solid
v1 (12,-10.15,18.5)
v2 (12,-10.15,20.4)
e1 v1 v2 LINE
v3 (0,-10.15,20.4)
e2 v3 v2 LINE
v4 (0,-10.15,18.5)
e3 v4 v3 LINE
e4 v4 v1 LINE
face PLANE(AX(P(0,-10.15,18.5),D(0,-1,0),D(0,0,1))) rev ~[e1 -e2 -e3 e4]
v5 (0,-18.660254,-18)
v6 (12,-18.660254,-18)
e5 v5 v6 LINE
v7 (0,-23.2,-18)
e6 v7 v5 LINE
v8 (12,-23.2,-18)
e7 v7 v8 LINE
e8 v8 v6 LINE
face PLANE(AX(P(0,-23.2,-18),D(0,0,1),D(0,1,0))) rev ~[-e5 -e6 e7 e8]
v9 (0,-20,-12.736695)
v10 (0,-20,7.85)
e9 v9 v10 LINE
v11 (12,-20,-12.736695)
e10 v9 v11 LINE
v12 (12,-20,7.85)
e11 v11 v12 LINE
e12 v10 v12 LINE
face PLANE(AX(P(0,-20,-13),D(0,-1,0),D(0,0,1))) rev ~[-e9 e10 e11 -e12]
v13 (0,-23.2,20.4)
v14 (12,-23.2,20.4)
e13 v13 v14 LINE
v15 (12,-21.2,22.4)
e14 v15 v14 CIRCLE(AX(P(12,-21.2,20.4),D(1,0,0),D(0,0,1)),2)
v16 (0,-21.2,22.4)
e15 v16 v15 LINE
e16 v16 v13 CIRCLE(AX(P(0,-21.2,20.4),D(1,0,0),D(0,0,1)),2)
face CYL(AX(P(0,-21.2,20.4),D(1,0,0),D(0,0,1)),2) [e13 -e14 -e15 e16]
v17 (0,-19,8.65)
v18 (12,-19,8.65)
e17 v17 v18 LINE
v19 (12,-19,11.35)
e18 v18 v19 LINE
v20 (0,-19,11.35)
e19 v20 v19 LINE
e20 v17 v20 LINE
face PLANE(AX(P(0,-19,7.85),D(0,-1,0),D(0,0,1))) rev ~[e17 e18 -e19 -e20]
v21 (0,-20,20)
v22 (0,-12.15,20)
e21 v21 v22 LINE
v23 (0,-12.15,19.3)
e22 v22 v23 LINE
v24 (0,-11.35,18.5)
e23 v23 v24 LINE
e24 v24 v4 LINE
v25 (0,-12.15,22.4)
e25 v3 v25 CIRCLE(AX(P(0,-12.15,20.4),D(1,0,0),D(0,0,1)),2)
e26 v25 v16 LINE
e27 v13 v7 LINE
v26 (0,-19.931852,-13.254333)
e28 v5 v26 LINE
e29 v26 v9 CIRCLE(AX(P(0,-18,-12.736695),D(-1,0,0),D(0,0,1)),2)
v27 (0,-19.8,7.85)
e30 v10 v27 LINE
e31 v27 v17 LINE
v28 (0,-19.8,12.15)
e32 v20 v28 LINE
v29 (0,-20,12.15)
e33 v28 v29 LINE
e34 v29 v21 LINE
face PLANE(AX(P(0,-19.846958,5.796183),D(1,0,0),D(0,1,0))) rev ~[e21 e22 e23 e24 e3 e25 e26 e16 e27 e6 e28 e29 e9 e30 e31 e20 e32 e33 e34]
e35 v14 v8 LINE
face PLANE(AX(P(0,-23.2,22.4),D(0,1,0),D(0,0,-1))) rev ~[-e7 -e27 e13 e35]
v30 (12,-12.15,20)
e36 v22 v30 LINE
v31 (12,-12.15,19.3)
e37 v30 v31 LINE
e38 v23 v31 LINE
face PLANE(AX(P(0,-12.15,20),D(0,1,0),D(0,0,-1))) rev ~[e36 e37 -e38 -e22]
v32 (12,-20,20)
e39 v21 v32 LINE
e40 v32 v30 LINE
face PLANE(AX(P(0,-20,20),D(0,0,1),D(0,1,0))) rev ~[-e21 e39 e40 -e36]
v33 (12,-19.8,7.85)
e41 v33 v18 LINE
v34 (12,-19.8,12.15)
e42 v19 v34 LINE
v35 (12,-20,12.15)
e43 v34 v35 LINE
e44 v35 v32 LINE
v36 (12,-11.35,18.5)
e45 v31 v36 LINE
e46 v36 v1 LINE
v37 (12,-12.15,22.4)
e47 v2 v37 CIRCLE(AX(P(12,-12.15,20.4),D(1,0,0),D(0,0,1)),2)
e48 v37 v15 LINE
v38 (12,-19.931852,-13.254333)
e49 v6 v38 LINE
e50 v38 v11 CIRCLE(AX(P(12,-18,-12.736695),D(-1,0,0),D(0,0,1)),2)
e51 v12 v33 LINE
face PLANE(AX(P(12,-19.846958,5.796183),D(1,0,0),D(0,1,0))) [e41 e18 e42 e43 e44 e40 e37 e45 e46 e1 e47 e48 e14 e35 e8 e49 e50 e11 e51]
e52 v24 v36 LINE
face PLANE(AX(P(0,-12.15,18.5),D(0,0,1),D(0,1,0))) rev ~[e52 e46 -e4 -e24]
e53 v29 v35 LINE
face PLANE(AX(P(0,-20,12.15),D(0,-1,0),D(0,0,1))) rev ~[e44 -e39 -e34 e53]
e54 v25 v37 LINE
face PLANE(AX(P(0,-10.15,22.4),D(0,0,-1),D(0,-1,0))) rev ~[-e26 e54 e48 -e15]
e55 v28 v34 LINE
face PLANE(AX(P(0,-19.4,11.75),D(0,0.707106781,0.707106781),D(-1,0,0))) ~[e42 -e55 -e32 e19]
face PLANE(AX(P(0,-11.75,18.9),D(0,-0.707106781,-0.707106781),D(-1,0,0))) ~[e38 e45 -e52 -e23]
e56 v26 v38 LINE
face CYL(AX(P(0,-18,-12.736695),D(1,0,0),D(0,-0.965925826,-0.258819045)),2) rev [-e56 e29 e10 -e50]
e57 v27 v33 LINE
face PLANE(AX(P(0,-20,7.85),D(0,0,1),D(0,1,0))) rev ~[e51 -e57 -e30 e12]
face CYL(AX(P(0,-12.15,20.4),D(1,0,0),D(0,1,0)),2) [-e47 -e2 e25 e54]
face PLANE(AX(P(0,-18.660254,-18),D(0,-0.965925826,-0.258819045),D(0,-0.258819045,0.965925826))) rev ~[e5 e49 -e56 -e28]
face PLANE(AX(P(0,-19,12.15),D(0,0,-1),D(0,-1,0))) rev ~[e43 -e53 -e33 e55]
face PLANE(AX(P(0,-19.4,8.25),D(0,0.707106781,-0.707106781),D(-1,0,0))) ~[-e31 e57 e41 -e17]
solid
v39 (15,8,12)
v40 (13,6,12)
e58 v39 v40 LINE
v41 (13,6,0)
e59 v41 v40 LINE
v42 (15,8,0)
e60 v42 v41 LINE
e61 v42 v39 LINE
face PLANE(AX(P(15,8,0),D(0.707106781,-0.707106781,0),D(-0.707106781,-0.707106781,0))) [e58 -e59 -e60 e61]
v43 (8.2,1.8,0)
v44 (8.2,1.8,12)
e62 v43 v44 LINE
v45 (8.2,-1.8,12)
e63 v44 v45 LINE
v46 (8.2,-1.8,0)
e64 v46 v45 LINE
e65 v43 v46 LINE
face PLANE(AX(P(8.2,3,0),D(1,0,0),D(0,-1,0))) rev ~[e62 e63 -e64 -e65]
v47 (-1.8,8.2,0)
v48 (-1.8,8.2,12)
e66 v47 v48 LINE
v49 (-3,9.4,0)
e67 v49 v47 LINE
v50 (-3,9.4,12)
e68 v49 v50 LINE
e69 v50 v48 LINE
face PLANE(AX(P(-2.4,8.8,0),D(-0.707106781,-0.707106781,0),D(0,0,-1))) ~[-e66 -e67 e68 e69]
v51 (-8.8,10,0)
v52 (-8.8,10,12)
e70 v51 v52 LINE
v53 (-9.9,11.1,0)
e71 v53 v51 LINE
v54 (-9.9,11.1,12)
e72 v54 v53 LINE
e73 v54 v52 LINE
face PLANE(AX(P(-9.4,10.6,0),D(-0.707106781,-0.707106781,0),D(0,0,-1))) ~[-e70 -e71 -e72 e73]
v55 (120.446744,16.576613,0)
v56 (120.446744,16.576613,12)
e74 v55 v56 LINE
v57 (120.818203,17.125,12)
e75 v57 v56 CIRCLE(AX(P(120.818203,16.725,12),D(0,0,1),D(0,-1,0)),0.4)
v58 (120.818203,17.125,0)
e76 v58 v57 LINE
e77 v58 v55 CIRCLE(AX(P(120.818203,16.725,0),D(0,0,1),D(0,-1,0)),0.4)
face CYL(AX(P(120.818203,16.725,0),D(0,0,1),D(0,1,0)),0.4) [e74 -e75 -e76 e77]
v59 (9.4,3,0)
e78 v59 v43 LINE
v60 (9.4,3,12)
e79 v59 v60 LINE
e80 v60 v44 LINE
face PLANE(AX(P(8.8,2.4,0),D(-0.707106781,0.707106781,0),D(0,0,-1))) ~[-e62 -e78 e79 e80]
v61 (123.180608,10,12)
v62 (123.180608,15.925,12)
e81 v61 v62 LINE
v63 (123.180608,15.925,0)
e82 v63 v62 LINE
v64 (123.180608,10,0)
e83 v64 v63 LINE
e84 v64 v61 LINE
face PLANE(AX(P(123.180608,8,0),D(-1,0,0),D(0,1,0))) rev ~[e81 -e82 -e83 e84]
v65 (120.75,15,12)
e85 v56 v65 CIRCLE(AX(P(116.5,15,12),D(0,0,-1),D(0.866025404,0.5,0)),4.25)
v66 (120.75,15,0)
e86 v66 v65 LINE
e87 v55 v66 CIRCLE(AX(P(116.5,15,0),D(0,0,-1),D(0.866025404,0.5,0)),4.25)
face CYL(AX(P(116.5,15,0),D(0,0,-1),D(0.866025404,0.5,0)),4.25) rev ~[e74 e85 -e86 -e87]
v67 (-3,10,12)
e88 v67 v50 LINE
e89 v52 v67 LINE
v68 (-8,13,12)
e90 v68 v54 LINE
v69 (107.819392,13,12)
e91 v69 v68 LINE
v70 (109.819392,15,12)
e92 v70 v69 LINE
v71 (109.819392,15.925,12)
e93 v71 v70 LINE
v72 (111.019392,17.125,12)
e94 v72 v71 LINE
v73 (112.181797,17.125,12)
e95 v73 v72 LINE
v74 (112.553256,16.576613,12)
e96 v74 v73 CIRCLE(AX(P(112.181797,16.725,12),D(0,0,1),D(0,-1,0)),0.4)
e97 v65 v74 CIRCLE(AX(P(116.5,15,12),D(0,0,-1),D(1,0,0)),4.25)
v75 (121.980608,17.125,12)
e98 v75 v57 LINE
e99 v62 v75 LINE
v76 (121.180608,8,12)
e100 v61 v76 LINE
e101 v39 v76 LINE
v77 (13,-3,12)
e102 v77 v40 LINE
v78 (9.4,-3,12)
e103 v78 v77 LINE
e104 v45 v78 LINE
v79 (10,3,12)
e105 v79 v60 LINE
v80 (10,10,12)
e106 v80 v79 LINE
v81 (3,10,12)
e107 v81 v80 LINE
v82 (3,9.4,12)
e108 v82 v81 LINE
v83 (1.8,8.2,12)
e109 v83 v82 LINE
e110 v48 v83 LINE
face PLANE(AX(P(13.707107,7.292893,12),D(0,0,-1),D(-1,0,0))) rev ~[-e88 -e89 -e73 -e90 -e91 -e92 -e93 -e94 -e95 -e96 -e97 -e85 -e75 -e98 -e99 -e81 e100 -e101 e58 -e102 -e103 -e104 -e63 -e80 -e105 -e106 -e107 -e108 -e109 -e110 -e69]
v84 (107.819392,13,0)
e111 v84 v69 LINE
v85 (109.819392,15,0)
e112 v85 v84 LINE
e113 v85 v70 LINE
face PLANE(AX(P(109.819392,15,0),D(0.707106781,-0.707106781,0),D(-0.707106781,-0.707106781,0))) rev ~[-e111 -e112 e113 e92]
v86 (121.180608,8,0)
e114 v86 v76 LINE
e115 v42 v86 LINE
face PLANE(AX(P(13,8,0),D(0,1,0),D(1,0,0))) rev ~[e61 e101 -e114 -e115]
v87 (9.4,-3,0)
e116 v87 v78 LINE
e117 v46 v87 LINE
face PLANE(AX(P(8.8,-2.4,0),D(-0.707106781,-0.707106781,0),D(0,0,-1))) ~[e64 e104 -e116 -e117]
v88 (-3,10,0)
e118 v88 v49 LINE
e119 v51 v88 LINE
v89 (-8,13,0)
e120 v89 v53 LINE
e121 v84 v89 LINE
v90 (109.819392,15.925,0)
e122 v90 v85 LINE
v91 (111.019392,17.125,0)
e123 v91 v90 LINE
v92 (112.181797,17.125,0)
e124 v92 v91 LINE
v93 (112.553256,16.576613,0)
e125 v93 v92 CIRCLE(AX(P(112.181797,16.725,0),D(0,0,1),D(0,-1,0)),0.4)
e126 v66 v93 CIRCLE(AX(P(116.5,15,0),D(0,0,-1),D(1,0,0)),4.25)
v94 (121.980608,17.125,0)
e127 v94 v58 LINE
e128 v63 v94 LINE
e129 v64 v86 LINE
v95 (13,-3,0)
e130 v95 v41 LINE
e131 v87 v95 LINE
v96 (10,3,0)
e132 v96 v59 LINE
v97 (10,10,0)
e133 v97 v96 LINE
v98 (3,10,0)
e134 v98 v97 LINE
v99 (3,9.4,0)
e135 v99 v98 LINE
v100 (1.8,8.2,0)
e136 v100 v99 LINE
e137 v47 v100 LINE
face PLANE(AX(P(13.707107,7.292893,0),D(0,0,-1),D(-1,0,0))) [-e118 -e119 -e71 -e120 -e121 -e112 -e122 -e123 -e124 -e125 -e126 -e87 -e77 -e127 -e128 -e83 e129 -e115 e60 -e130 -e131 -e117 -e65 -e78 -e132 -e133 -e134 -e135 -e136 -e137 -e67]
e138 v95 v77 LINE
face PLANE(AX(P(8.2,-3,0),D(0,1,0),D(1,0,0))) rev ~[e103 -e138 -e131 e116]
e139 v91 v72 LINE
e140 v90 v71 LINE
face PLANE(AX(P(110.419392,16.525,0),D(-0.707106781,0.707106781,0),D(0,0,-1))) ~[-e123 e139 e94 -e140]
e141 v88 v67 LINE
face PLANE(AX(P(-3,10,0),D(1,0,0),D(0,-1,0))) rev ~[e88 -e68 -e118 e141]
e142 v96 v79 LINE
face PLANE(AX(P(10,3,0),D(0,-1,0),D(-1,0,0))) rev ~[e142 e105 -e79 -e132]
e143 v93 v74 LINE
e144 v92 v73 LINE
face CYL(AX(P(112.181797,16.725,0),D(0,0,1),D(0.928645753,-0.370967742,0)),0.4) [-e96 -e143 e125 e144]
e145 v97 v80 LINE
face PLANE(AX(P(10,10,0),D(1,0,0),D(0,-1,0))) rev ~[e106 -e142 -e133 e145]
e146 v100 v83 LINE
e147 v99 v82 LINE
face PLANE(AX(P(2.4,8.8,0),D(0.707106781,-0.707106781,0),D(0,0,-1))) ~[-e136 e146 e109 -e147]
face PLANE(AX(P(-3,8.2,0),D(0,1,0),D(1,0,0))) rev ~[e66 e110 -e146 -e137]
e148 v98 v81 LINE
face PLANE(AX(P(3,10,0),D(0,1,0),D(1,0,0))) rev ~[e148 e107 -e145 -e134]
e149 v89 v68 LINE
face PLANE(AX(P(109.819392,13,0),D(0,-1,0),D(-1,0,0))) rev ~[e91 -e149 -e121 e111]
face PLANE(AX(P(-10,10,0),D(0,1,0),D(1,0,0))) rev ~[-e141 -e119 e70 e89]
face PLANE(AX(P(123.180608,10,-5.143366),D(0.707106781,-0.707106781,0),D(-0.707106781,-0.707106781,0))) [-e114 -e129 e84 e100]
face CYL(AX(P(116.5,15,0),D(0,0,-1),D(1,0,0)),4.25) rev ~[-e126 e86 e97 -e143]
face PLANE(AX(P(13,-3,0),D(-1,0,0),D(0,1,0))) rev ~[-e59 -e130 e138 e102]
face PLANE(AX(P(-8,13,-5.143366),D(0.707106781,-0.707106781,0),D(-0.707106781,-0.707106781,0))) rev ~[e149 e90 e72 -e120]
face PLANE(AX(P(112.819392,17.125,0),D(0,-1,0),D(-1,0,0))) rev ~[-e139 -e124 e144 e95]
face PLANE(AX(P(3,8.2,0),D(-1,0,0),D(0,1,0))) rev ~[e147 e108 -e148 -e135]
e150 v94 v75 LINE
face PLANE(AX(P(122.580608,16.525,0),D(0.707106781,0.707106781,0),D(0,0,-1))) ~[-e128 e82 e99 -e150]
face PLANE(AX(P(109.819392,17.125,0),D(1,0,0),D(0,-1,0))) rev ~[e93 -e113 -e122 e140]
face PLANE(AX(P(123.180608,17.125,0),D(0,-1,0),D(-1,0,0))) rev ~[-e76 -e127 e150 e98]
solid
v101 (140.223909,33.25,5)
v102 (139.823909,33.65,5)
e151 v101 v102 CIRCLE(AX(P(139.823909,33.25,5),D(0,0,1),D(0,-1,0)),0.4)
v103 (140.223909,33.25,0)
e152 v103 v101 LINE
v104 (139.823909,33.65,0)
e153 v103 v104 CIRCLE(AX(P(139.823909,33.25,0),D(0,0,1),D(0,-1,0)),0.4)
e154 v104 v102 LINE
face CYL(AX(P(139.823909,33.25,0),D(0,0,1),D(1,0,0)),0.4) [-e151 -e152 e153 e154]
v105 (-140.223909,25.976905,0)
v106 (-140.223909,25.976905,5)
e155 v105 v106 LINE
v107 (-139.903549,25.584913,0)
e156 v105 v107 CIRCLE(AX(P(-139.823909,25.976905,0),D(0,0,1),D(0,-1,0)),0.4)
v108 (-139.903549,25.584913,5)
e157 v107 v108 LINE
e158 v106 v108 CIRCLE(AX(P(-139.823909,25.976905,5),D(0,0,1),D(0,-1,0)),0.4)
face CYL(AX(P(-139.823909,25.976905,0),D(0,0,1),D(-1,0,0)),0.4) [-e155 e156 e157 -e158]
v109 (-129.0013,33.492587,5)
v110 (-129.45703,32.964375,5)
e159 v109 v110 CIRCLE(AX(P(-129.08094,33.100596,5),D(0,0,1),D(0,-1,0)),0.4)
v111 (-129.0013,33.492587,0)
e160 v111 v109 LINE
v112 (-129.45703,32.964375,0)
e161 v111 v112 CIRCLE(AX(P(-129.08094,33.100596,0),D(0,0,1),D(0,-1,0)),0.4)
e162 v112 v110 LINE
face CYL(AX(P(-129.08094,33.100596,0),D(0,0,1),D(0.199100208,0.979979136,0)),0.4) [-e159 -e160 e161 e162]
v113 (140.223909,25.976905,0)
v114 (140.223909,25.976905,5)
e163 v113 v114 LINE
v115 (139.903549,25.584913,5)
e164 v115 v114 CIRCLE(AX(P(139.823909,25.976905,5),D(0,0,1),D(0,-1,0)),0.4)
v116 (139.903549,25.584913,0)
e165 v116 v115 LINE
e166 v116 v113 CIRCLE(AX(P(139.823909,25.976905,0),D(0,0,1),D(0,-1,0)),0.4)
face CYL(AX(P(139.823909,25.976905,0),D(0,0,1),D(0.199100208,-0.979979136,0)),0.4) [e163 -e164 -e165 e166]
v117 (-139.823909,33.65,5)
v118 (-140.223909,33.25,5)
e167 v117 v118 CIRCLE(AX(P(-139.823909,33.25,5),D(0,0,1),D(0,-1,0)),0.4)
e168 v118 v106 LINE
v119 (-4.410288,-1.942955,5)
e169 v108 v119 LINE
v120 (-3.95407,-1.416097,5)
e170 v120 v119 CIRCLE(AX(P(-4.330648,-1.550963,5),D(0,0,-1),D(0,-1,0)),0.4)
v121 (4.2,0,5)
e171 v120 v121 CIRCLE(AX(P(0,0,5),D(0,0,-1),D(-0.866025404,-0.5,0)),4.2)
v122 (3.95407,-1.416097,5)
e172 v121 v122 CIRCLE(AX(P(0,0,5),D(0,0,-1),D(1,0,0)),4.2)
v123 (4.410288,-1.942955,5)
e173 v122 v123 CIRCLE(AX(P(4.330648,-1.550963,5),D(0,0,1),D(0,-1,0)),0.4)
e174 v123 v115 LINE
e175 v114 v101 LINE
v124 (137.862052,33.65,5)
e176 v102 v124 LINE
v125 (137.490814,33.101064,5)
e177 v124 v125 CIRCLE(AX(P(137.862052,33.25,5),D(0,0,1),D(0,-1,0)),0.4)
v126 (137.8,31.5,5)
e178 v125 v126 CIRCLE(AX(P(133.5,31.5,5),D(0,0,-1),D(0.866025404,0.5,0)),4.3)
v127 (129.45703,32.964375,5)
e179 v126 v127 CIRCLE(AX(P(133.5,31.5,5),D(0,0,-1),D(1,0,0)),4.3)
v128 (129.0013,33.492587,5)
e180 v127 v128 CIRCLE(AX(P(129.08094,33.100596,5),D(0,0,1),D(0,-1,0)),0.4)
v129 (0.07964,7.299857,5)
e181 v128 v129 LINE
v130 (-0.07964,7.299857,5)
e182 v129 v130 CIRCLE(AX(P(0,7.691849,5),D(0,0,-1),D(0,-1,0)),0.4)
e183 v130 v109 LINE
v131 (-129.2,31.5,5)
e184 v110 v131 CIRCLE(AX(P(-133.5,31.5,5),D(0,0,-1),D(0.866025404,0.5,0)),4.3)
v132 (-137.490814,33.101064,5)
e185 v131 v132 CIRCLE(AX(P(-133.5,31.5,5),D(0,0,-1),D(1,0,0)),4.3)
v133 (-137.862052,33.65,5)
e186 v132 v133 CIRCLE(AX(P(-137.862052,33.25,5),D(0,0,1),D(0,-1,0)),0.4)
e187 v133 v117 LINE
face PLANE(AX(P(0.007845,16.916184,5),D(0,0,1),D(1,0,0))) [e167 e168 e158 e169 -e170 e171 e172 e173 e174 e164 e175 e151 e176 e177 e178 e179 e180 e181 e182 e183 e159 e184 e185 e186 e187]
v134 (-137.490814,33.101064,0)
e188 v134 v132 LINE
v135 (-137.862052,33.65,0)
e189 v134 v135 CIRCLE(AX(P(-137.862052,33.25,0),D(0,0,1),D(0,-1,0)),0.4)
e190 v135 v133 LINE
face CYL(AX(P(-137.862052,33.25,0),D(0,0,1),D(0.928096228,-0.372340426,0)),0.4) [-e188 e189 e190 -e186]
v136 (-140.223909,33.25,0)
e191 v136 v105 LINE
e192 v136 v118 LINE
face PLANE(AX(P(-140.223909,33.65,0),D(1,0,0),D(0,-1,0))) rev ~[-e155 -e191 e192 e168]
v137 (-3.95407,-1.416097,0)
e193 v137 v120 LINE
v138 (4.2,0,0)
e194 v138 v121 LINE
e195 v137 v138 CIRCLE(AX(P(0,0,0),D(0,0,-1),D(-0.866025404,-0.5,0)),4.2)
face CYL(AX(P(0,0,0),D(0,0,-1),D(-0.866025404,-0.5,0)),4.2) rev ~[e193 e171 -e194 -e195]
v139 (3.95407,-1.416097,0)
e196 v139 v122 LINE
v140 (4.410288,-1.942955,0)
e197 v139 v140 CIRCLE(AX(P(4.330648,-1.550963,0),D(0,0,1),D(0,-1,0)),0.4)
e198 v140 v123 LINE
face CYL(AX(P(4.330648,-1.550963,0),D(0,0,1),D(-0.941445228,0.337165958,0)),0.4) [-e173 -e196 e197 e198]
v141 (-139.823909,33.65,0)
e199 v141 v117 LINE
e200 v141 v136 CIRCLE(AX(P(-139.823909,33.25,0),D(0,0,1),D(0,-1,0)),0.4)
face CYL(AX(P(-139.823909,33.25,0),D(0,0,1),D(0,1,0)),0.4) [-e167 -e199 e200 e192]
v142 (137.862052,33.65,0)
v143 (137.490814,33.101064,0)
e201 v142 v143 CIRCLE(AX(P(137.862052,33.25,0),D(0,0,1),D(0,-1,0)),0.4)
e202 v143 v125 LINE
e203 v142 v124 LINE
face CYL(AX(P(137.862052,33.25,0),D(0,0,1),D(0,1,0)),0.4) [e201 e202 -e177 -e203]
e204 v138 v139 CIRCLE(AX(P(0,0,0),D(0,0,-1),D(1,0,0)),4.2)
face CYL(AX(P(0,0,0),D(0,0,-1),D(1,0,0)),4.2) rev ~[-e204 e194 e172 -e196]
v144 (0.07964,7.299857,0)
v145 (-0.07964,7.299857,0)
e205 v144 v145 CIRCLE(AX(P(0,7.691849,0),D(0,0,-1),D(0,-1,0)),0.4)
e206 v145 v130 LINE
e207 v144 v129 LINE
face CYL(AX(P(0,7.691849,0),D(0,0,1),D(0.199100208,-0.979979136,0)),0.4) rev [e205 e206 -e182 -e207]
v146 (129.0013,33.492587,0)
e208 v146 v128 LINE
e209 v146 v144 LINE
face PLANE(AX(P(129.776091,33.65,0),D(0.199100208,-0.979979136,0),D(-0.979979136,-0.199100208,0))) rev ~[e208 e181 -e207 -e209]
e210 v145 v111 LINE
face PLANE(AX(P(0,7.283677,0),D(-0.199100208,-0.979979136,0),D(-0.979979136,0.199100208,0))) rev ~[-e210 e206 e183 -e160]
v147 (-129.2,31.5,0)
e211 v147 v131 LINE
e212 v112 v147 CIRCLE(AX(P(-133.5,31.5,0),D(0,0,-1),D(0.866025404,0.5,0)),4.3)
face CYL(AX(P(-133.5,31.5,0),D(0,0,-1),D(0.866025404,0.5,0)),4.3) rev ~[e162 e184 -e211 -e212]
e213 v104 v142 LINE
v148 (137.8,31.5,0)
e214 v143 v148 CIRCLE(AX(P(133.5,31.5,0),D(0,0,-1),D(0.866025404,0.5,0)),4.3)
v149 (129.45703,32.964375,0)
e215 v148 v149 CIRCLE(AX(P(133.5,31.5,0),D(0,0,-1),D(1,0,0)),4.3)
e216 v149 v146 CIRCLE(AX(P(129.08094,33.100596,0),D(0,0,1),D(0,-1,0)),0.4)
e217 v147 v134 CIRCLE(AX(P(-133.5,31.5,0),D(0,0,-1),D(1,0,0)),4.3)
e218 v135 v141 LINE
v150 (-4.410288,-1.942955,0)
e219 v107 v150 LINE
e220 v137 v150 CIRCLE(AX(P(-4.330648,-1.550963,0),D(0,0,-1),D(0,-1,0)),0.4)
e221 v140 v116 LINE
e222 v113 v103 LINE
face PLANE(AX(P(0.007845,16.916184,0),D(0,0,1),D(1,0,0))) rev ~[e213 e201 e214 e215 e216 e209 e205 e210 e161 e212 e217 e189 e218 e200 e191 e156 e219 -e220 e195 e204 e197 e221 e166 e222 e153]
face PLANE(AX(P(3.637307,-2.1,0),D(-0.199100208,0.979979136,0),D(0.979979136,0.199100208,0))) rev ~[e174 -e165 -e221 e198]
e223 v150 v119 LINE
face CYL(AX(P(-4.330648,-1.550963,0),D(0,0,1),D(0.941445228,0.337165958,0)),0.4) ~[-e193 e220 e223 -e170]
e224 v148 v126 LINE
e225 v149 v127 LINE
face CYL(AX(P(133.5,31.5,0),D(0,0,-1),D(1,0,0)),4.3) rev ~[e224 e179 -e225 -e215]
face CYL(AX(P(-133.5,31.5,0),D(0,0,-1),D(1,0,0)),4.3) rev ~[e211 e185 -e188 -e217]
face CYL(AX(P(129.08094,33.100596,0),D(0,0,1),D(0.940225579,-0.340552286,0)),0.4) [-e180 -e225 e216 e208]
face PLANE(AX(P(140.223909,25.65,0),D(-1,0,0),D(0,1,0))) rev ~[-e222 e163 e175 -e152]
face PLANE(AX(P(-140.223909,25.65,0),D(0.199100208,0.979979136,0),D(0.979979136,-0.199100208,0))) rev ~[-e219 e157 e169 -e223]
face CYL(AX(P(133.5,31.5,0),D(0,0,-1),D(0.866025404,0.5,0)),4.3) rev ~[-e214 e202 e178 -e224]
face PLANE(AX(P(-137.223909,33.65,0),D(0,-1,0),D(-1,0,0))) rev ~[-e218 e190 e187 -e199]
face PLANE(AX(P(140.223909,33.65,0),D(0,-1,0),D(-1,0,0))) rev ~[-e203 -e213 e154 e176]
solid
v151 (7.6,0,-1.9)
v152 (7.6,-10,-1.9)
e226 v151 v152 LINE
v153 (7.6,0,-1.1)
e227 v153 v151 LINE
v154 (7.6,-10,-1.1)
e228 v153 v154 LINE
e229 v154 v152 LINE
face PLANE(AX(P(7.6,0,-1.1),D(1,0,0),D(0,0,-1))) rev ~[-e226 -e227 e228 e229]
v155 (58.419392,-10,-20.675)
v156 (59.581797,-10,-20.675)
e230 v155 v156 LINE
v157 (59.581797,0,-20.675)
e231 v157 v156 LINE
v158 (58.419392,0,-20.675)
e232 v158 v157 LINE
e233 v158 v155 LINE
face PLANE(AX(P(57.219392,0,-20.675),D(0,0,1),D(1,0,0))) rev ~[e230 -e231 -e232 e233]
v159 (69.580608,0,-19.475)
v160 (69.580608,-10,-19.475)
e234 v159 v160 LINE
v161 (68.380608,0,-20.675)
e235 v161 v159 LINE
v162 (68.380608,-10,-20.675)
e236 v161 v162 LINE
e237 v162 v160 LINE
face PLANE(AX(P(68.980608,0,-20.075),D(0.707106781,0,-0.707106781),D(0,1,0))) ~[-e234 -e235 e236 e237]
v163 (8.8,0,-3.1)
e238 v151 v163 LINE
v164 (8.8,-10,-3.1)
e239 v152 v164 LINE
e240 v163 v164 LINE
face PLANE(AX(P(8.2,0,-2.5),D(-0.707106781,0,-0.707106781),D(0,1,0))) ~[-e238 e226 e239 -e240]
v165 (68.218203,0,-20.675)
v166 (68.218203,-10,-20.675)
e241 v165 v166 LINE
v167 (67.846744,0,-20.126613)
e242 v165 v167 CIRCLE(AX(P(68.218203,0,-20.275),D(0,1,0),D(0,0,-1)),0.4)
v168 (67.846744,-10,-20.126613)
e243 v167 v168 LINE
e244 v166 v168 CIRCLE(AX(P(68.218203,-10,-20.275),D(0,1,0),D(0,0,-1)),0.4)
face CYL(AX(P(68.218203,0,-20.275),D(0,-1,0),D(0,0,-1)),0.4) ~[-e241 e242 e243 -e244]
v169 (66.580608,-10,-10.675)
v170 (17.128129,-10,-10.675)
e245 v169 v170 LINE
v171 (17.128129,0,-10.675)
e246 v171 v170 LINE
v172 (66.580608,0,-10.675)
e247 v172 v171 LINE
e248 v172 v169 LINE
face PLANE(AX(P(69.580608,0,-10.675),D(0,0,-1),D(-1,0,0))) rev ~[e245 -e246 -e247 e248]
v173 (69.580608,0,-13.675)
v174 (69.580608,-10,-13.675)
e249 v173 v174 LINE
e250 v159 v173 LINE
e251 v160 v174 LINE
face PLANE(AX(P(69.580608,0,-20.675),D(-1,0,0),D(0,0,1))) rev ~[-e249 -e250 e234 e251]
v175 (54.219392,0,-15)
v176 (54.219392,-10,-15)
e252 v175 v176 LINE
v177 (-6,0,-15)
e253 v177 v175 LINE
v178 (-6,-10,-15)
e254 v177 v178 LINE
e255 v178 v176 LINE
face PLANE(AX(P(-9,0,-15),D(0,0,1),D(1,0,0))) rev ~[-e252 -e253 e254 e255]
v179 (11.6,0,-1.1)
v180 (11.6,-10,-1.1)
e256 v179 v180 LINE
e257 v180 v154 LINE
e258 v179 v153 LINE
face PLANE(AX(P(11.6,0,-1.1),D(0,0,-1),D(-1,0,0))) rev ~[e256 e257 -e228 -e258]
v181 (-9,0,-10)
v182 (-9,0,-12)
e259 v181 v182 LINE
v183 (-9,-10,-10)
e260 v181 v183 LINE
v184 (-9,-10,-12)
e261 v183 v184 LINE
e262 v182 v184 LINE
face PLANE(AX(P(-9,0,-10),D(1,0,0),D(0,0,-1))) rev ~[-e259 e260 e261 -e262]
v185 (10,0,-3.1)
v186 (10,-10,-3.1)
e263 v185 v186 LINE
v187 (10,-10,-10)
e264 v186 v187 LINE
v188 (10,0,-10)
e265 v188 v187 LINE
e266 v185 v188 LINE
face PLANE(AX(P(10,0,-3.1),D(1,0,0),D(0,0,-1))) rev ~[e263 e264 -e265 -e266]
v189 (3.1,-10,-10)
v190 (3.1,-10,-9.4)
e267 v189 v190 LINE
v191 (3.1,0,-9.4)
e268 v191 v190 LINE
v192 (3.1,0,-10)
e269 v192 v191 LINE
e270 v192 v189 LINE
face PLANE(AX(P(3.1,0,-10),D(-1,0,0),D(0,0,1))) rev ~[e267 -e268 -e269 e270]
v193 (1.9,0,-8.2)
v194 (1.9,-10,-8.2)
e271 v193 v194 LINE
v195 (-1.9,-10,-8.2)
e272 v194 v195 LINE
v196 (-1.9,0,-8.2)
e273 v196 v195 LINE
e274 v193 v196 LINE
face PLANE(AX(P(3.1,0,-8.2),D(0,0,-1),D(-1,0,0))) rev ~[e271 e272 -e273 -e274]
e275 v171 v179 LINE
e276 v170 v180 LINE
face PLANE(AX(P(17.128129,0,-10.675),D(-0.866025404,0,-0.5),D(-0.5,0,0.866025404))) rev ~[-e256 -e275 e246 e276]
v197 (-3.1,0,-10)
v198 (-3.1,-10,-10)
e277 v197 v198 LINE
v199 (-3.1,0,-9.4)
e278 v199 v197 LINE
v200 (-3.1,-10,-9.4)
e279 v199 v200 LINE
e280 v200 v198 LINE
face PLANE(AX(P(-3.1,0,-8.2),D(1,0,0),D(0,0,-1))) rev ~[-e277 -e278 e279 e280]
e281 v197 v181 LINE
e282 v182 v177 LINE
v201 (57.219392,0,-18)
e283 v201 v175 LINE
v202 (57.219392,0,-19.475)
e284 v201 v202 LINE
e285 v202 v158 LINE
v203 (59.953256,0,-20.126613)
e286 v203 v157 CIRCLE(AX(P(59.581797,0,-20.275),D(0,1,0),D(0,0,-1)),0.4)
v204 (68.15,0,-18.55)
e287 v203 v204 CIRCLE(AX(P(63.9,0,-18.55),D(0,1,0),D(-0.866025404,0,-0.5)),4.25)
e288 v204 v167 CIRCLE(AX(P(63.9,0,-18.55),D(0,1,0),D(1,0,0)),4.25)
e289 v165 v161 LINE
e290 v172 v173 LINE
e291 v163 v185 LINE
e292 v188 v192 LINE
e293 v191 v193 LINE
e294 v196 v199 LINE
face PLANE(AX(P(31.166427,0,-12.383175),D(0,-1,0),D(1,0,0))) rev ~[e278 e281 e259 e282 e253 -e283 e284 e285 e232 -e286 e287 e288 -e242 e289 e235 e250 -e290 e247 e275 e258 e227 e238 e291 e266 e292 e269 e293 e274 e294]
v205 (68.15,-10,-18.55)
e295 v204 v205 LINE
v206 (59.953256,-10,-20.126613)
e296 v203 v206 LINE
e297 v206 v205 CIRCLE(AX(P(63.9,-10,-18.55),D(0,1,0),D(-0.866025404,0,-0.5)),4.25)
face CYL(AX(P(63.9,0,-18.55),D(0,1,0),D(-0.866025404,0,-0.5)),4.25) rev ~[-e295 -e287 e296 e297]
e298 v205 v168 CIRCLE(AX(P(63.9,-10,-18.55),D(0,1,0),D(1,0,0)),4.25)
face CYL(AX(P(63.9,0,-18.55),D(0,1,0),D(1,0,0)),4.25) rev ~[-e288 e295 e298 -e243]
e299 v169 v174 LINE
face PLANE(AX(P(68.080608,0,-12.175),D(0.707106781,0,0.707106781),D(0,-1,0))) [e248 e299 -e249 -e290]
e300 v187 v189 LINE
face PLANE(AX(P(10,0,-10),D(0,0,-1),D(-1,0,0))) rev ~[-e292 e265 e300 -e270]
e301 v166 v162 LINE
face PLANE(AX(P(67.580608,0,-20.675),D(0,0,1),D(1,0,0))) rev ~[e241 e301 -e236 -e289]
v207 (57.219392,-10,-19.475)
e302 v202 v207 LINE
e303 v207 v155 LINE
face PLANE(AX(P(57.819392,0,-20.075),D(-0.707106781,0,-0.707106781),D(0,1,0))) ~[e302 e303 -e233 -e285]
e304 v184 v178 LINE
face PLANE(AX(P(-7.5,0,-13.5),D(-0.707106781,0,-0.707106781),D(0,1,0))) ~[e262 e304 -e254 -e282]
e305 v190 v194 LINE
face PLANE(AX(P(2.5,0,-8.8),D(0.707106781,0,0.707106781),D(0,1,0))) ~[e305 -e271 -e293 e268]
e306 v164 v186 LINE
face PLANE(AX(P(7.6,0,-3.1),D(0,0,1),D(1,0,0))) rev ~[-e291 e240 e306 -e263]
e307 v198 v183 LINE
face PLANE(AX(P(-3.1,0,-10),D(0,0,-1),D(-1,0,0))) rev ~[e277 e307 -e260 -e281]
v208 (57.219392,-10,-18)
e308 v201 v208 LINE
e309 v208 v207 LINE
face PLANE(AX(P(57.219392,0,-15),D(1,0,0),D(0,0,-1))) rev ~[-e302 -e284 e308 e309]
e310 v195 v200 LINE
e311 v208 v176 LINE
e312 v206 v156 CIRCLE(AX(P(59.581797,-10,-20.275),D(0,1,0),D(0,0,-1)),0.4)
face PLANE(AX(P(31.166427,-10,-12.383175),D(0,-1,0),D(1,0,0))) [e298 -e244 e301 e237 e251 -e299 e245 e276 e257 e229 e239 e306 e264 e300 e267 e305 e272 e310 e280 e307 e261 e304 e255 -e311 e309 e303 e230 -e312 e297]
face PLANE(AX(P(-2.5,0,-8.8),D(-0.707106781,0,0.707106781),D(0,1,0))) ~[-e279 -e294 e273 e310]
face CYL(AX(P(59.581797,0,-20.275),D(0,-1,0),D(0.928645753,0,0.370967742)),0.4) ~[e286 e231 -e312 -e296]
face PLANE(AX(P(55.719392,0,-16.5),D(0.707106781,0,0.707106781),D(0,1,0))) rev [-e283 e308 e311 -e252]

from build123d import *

# Parameters (mm, degrees)
F2_DEPTH    = 10
F3_SIZE     = 1.2
F4_SIZE     = 3
F6_DEPTH    = 12
F7_SIZE     = 1.2
F8_T1_DEPTH = 12
F8_T3_DEPTH = 22.2867319519
F9_R        = 0.4
F9_2_R      = 0.4
F15_DEPTH   = 5
F16_R       = 0.4
F12_DEPTH   = 12
F13_SIZE    = 0.8
F14_R       = 2


# Not quite as in the source:
# - a fillet or chamfer that OpenCascade refuses, or shapes differently, is made with other operations: its cross-section is extruded or revolved along the edge and cut away or added


with BuildPart() as f2:
    # F1 (on Front) → F2 (new body)
    with BuildSketch(Plane.XZ):
        with BuildLine():
            Line((7.6, -1.1), (7.6, -3.1))
            Line((7.6, -3.1), (10, -3.1))
            Line((10, -3.1), (10, -10))
            Line((10, -10), (3.1, -10))
            Line((3.1, -10), (3.1, -8.2))
            Line((3.1, -8.2), (-3.1, -8.2))
            Line((-3.1, -8.2), (-3.1, -10))
            Line((-3.1, -10), (-9, -10))
            Line((-9, -10), (-9, -15))
            Line((-9, -15), (57.2193920339, -15))
            Line((57.2193920339, -15), (57.2193920339, -20.675))
            Line((57.2193920339, -20.675), (60.2193920339, -20.675))
            ThreePointArc((60.2193920339, -20.675), (62.8000190583, -14.4448152383), (68.15, -18.55))
            ThreePointArc((68.15, -18.55), (68.0051847617, -19.6499809417), (67.5806079661, -20.675))
            Line((67.5806079661, -20.675), (69.5806079661, -20.675))
            Line((69.5806079661, -20.675), (69.5806079661, -10.675))
            Line((69.5806079661, -10.675), (17.1281288275, -10.675))
            Line((17.1281288275, -10.675), (11.6, -1.1))
            Line((11.6, -1.1), (7.6, -1.1))
        make_face()
    extrude(amount=F2_DEPTH)

    # F3
    f3_edges = [f2.edges().sort_by_distance(p)[0] for p in [
        (-3.1, -5, -8.2),
        (3.1, -5, -8.2),
        (7.6, -5, -3.1),
        (57.219392, -5, -20.675),
        (69.580608, -5, -20.675),
    ]]
    chamfer(f3_edges, length=F3_SIZE)

    # F4
    f4_edges = [f2.edges().sort_by_distance(p)[0] for p in [
        (-9, -5, -15),
        (57.219392, -5, -15),
        (69.580608, -5, -10.675),
    ]]
    chamfer(f4_edges, length=F4_SIZE)

    # F9
    f9_edges = [f2.edges().sort_by_distance(p)[0] for p in [
        (60.219392, -5, -20.675),
        (67.580608, -5, -20.675),
    ]]
    fillet(f9_edges, radius=F9_R)


with BuildPart() as f6:
    # F5 (on Top) → F6 (new body)
    with BuildSketch(Plane.XY):
        with BuildLine():
            ThreePointArc((120.1806079661, 17.125), (120.6051847617, 16.0999809417), (120.75, 15))
            ThreePointArc((120.75, 15), (115.4000190583, 10.8948152383), (112.8193920339, 17.125))
            Line((112.8193920339, 17.125), (109.8193920339, 17.125))
            Line((109.8193920339, 17.125), (109.8193920339, 13))
            Line((109.8193920339, 13), (-10, 13))
            Line((-10, 13), (-10, 10))
            Line((-10, 10), (-3, 10))
            Line((-3, 10), (-3, 8.2))
            Line((-3, 8.2), (3, 8.2))
            Line((3, 8.2), (3, 10))
            Line((3, 10), (10, 10))
            Line((10, 10), (10, 3))
            Line((10, 3), (8.2, 3))
            Line((8.2, 3), (8.2, -3))
            Line((8.2, -3), (10, -3))
            Line((10, -3), (13, -3))
            Line((13, -3), (13, 8))
            Line((13, 8), (123.1806079661, 8))
            Line((123.1806079661, 8), (123.1806079661, 17.125))
            Line((123.1806079661, 17.125), (120.1806079661, 17.125))
        make_face()
    extrude(amount=F6_DEPTH)

    # F7
    f7_edges = [f6.edges().sort_by_distance(p)[0] for p in [
        (8.2, 3, 6),
        (8.2, -3, 6),
        (-3, 8.2, 6),
        (3, 8.2, 6),
        (-10, 10, 6),
        (109.819392, 17.125, 6),
        (123.180608, 17.125, 6),
    ]]
    chamfer(f7_edges, length=F7_SIZE)

    # F8: chamfer of 2 on 4 edges, made by hand

    # F8_s2 → F8_t1 (join)
    with BuildSketch(Plane.XY):
        Polygon((15, 8), (13, 6), (13, 8), align=None)
        Polygon((109.8193920339, 15), (107.8193920339, 13), (109.8193920339, 13), align=None)
    extrude(amount=F8_T1_DEPTH)

    # F8_s4 → F8_t3 (cut)
    with BuildSketch(Plane.XY.offset(-5.1433659759)):
        Polygon((-8, 13), (-10, 11), (-10, 13), align=None)
        Polygon((123.1806079661, 10), (121.1806079661, 8), (123.1806079661, 8), align=None)
    extrude(amount=F8_T3_DEPTH, mode=Mode.SUBTRACT)

    # F9#2
    f9_2_edges = [f6.edges().sort_by_distance(p)[0] for p in [
        (112.819392, 17.125, 6),
        (120.180608, 17.125, 6),
    ]]
    fillet(f9_2_edges, radius=F9_2_R)


with BuildPart() as f15:
    # F10 (on Top) → F15 (new body)
    with BuildSketch(Plane.XY):
        with BuildLine():
            ThreePointArc((-3.6373066959, -2.1), (-1.0870399894, 4.0568884704), (4.2, 0))
            ThreePointArc((4.2, 0), (4.0568884704, -1.0870399894), (3.6373066959, -2.1))
            Line((3.6373066959, -2.1), (140.2239092363, 25.65))
            Line((140.2239092363, 25.65), (140.2239092363, 33.65))
            Line((140.2239092363, 33.65), (137.2239092363, 33.65))
            ThreePointArc((137.2239092363, 33.65), (137.653481053, 32.6129218939), (137.8, 31.5))
            ThreePointArc((137.8, 31.5), (132.3870781061, 27.346518947), (129.7760907637, 33.65))
            Line((129.7760907637, 33.65), (0, 7.2836767171))
            Line((0, 7.2836767171), (-129.7760907637, 33.65))
            ThreePointArc((-129.7760907637, 33.65), (-129.346518947, 32.6129218939), (-129.2, 31.5))
            ThreePointArc((-129.2, 31.5), (-134.6129218939, 27.346518947), (-137.2239092363, 33.65))
            Line((-137.2239092363, 33.65), (-140.2239092363, 33.65))
            Line((-140.2239092363, 33.65), (-140.2239092363, 25.65))
            Line((-140.2239092363, 25.65), (-3.6373066959, -2.1))
        make_face()
    extrude(amount=F15_DEPTH)

    # F16
    f16_edges = [f15.edges().sort_by_distance(p)[0] for p in [
        (-3.637307, -2.1, 2.5),
        (3.637307, -2.1, 2.5),
        (0, 7.283677, 2.5),
        (129.776091, 33.65, 2.5),
        (137.223909, 33.65, 2.5),
        (140.223909, 33.65, 2.5),
        (140.223909, 25.65, 2.5),
        (-140.223909, 33.65, 2.5),
        (-140.223909, 25.65, 2.5),
        (-129.776091, 33.65, 2.5),
        (-137.223909, 33.65, 2.5),
    ]]
    fillet(f16_edges, radius=F16_R)


with BuildPart() as f12:
    # F11 (on Right) → F12 (new body)
    with BuildSketch(Plane.YZ):
        Polygon((-12.15, 20), (-12.15, 18.5), (-10.15, 18.5), (-10.15, 22.4), (-23.2, 22.4), (-23.2, -18), (-18.6602540378, -18), (-20, -13), (-20, 7.85), (-19, 7.85), (-19, 12.15), (-20, 12.15), (-20, 20), align=None)
    extrude(amount=F12_DEPTH)

    # F13
    f13_edges = [f12.edges().sort_by_distance(p)[0] for p in [
        (6, -19, 12.15),
        (6, -12.15, 18.5),
        (6, -19, 7.85),
    ]]
    chamfer(f13_edges, length=F13_SIZE)

    # F14
    f14_edges = [f12.edges().sort_by_distance(p)[0] for p in [
        (6, -23.2, 22.4),
        (6, -20, -13),
        (6, -10.15, 22.4),
    ]]
    fillet(f14_edges, radius=F14_R)


solid = Compound([f2.part, f6.part, f15.part, f12.part])
